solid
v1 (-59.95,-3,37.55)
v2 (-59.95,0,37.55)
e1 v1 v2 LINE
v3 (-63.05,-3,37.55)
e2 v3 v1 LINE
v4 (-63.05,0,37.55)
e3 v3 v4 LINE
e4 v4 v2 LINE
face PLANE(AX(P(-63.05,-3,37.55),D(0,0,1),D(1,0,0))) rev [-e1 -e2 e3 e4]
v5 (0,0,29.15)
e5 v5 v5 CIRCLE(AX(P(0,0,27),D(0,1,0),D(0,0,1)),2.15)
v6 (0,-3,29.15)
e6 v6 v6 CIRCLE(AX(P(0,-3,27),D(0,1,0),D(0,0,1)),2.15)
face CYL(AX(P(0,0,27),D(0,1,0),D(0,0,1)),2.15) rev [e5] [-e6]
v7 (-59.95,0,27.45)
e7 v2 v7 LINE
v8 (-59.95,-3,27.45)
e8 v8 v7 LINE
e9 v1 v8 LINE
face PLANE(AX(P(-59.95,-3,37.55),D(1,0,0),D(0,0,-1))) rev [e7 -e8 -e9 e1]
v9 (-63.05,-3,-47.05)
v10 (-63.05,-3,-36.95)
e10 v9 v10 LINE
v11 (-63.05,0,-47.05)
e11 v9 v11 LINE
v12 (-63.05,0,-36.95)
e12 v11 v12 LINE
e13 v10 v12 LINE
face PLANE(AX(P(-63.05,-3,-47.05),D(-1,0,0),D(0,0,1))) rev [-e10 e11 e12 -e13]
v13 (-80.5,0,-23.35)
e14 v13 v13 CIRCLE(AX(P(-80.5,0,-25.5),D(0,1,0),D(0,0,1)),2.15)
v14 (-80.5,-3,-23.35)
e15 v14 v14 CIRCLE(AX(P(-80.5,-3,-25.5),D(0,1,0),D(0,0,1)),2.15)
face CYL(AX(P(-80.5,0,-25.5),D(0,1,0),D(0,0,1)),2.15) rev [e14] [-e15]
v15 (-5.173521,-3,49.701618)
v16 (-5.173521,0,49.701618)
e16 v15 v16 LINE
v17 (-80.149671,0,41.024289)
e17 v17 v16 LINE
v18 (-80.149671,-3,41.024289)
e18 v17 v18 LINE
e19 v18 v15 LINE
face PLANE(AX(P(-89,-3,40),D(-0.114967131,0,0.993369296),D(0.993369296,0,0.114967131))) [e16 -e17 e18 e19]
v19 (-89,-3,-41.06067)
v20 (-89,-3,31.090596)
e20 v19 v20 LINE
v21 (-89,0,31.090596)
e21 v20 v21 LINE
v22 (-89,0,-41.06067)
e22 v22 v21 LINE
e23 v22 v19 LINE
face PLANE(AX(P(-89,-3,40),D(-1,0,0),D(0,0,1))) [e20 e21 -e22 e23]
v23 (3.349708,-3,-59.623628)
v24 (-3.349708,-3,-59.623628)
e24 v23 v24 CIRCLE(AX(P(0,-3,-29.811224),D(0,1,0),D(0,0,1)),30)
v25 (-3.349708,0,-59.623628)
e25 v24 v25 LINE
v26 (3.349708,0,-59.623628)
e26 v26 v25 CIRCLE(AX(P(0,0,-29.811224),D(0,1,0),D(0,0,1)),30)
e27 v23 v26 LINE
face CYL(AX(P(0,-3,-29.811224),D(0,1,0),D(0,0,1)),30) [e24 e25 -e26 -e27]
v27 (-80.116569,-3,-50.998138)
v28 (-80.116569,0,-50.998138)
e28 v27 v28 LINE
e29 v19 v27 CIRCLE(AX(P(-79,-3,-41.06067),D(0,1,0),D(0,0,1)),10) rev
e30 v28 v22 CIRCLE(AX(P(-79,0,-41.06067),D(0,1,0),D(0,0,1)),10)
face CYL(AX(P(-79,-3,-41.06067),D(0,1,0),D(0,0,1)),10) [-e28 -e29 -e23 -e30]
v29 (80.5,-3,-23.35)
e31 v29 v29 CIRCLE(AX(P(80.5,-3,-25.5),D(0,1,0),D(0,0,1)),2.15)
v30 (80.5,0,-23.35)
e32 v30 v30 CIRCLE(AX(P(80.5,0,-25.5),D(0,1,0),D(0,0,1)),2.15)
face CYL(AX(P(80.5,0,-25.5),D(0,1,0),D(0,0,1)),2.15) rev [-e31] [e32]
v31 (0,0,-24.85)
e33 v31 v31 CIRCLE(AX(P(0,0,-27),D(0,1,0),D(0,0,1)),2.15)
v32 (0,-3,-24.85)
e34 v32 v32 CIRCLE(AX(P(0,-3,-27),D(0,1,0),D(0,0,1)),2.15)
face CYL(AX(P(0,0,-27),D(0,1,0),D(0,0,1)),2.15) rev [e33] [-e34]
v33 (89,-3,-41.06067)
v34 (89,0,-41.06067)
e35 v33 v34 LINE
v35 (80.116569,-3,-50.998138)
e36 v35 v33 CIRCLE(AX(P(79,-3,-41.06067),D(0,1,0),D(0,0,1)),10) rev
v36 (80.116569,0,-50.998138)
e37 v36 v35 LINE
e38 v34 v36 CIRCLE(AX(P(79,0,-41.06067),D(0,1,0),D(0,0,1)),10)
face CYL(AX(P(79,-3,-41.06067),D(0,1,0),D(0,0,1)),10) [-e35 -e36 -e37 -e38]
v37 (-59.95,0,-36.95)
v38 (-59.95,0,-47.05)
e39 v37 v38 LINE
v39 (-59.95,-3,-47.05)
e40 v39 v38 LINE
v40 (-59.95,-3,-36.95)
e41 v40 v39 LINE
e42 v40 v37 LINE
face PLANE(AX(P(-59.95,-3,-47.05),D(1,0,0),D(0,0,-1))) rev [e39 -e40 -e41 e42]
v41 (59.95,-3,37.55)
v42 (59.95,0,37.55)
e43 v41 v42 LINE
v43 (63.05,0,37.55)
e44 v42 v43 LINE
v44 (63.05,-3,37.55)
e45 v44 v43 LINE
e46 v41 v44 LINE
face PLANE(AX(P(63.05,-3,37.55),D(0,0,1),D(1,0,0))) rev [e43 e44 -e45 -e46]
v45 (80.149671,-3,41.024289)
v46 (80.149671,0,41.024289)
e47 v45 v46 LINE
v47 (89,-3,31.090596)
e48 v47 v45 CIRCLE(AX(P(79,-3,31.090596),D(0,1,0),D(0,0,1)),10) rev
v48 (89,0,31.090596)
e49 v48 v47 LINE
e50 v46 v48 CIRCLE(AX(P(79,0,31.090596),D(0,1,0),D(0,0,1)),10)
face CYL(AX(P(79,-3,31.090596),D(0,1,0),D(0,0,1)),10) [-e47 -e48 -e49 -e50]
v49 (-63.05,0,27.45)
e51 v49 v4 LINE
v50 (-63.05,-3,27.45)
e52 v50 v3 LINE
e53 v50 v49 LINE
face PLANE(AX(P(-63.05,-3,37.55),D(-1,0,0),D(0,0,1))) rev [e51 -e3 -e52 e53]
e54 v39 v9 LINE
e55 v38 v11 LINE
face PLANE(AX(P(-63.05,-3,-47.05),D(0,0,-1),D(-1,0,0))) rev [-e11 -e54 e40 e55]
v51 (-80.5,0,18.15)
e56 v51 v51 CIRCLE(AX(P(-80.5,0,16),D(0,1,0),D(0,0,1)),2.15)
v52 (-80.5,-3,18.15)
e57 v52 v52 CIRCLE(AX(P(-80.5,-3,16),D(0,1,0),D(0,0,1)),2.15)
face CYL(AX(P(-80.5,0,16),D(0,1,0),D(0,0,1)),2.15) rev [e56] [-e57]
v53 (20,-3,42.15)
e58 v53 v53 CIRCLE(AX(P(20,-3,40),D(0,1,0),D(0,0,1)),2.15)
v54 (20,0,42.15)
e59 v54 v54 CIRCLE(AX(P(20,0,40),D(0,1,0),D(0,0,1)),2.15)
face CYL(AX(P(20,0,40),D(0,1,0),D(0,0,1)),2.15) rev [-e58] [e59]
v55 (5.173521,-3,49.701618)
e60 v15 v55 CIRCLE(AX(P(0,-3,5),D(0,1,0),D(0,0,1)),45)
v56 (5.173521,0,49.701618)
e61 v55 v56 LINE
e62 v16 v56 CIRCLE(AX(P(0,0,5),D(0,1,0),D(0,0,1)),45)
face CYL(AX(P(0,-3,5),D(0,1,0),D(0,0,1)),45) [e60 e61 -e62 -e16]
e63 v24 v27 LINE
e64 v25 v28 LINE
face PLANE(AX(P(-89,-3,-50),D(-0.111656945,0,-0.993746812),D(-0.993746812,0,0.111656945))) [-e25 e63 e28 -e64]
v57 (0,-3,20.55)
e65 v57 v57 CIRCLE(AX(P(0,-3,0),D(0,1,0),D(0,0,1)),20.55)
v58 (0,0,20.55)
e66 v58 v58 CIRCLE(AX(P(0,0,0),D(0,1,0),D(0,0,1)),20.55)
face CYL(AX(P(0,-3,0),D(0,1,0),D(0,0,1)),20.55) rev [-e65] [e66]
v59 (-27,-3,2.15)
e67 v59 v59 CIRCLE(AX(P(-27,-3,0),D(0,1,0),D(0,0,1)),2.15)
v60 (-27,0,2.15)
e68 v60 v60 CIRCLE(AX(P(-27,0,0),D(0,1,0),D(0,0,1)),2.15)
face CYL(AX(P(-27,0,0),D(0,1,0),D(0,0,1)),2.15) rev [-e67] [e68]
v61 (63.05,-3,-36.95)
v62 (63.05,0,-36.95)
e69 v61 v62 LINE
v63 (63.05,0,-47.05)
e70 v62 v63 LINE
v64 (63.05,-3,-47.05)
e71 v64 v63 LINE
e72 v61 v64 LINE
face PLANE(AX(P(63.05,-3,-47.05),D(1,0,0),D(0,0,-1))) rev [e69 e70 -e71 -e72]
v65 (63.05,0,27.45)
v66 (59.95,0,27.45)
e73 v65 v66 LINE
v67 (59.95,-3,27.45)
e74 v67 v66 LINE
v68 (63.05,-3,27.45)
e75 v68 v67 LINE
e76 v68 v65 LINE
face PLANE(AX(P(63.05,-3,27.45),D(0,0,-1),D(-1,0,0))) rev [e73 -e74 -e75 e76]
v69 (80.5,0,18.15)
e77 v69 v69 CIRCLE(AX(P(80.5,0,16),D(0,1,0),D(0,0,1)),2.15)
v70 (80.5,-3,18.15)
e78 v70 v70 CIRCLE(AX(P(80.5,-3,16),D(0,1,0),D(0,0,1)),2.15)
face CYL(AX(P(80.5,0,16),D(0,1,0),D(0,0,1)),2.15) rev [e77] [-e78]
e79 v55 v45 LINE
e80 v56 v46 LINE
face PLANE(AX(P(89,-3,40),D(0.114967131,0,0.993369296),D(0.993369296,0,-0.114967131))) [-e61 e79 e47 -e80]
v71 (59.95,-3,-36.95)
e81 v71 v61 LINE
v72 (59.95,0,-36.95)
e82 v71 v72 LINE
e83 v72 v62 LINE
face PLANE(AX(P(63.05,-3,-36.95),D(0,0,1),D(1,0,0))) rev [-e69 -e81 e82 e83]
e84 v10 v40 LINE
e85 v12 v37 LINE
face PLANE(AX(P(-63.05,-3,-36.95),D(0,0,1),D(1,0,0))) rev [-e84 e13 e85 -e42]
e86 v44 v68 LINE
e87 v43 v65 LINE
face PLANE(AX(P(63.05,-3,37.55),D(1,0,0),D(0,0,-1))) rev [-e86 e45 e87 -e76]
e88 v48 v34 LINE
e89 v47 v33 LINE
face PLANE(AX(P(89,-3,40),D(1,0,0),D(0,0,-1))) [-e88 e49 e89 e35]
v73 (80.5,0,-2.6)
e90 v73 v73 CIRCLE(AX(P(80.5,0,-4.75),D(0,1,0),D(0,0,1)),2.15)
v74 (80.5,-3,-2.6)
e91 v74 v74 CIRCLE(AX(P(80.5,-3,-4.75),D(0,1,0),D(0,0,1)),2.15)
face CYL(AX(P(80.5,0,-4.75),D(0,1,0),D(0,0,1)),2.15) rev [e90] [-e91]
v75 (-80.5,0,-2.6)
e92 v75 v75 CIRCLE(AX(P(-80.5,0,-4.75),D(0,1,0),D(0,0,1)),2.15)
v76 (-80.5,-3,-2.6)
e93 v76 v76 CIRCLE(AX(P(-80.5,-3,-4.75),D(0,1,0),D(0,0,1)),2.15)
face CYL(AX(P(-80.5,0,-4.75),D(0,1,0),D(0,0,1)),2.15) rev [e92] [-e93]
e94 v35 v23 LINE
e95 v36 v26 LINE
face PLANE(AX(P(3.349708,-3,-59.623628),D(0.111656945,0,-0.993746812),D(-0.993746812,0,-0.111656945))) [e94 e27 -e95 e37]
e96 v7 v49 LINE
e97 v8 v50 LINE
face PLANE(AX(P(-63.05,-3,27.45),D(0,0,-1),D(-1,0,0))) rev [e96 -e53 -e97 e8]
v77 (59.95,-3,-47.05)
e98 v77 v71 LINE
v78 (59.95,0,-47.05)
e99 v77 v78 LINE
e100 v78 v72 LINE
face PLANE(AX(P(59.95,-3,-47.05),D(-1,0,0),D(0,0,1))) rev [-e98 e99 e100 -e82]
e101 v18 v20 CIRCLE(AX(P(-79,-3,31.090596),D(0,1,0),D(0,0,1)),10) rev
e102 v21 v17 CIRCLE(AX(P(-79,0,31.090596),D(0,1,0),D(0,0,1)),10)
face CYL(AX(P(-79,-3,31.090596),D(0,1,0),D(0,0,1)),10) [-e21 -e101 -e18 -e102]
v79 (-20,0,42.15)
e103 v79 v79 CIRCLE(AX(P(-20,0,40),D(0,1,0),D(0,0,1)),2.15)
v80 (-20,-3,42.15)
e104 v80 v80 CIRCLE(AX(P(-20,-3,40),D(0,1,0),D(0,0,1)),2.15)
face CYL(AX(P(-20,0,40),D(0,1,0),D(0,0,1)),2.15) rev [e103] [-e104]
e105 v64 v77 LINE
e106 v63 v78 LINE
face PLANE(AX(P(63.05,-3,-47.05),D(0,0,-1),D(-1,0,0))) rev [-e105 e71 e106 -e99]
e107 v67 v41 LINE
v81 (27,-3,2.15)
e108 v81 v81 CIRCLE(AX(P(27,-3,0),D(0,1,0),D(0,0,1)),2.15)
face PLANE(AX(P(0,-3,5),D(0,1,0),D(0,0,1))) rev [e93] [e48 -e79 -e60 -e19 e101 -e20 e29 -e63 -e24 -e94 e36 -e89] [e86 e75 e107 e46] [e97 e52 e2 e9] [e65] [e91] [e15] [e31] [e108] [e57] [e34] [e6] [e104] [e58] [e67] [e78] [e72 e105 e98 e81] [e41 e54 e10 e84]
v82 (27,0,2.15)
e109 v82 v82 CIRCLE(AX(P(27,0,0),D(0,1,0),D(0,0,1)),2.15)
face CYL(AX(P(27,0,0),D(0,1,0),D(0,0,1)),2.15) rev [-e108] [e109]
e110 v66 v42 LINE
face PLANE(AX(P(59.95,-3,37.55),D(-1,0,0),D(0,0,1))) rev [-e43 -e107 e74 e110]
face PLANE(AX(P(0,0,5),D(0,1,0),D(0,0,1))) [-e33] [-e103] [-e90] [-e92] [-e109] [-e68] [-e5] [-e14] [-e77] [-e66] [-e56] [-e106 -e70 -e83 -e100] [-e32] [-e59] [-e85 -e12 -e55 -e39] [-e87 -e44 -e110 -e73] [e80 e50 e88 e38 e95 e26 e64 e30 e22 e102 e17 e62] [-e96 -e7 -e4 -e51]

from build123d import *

# Parameters (mm, degrees)
SKETCH1_R                = 20.55
SKETCH1_R_2              = 1
SKETCH1_W                = 3.1
SKETCH1_H                = 10.1
BASE_FLANGE1_DEPTH       = 3
FILLET1_R                = 10
M4_CLEARANCE_HOLE2_D     = 4.3
M4_CLEARANCE_HOLE2_DEPTH = 136
M4_CLEARANCE_HOLE2_TIP   = 1.291850331


# Sheet-metal steps are written as plain solids
with BuildPart() as part:
    # Sketch1 → Base-Flange1 (new body)
    with BuildSketch(Plane(origin=(0, 0, 0), x_dir=(1, 0, 0), z_dir=(0, 1, 0))):
        with BuildLine():
            Line((-89, -40), (-89, 50))
            Line((-89, 50), (-3.349708355, 59.623628275))
            ThreePointArc((-3.349708355, 59.623628275), (0, 59.811223911), (3.349708355, 59.623628275))
            Line((3.349708355, 59.623628275), (89, 50))
            Line((89, 50), (89, -40))
            Line((89, -40), (5.17352088, -49.701618334))
            ThreePointArc((5.17352088, -49.701618334), (0, -50), (-5.17352088, -49.701618334))
            Line((-5.17352088, -49.701618334), (-89, -40))
        make_face()
        with Locations(Location((0, 0, 0), (0, 0, 270))):
            Circle(SKETCH1_R, mode=Mode.SUBTRACT)
        with Locations(Location((0, 27, 0), (0, 0, 270))):
            Circle(SKETCH1_R_2, mode=Mode.SUBTRACT)
        with Locations(Location((-80.5, 25.5, 0), (0, 0, 270))):
            Circle(SKETCH1_R_2, mode=Mode.SUBTRACT)
        with Locations(Location((-80.5, 4.75, 0), (0, 0, 270))):
            Circle(SKETCH1_R_2, mode=Mode.SUBTRACT)
        with Locations(Location((-80.5, -16, 0), (0, 0, 270))):
            Circle(SKETCH1_R_2, mode=Mode.SUBTRACT)
        with Locations(Location((80.5, -16, 0), (0, 0, 90))):
            Circle(SKETCH1_R_2, mode=Mode.SUBTRACT)
        with Locations(Location((80.5, 4.75, 0), (0, 0, 90))):
            Circle(SKETCH1_R_2, mode=Mode.SUBTRACT)
        with Locations(Location((80.5, 25.5, 0), (0, 0, 90))):
            Circle(SKETCH1_R_2, mode=Mode.SUBTRACT)
        with Locations(Location((27, 0, 0), (0, 0, 270))):
            Circle(SKETCH1_R_2, mode=Mode.SUBTRACT)
        with Locations(Location((0, -27, 0), (0, 0, 270))):
            Circle(SKETCH1_R_2, mode=Mode.SUBTRACT)
        with Locations(Location((-27, 0, 0), (0, 0, 270))):
            Circle(SKETCH1_R_2, mode=Mode.SUBTRACT)
        with Locations(Location((20, -40, 0), (0, 0, 270))):
            Circle(SKETCH1_R_2, mode=Mode.SUBTRACT)
        with Locations(Location((-20, -40, 0), (0, 0, 270))):
            Circle(SKETCH1_R_2, mode=Mode.SUBTRACT)
        with Locations((-61.5, 42)):
            Rectangle(SKETCH1_W, SKETCH1_H, mode=Mode.SUBTRACT)
        with Locations((-61.5, -32.5)):
            Rectangle(SKETCH1_W, SKETCH1_H, mode=Mode.SUBTRACT)
        with Locations((61.5, -32.5)):
            Rectangle(SKETCH1_W, SKETCH1_H, mode=Mode.SUBTRACT)
        with Locations((61.5, 42)):
            Rectangle(SKETCH1_W, SKETCH1_H, mode=Mode.SUBTRACT)
    extrude(amount=-BASE_FLANGE1_DEPTH)

    # Fillet1
    fillet1_edges = [part.edges().sort_by_distance(p)[0] for p in [
        (89, -1.5, -50),
        (89, -1.5, 40),
        (-89, -1.5, 40),
        (-89, -1.5, -50),
    ]]
    fillet(fillet1_edges, radius=FILLET1_R)

    # M4 Clearance Hole2
    with Locations(Plane(origin=(0, 0, 0), x_dir=(1, 0, 0), z_dir=(0, 1, 0))):
        with Locations((-27, 0), (0, 27), (27, 0), (0, -27), (20, -40), (-20, -40), (80.5, -16), (80.5, 25.5), (80.5, 4.75), (-80.5, 25.5), (-80.5, 4.75), (-80.5, -16)):
            Hole(M4_CLEARANCE_HOLE2_D / 2, depth=M4_CLEARANCE_HOLE2_DEPTH)
            with Locations((0, 0, -(M4_CLEARANCE_HOLE2_DEPTH + M4_CLEARANCE_HOLE2_TIP / 2))):  # 118° drill point
                Cone(0, M4_CLEARANCE_HOLE2_D / 2, M4_CLEARANCE_HOLE2_TIP, mode=Mode.SUBTRACT)


solid = part.part
